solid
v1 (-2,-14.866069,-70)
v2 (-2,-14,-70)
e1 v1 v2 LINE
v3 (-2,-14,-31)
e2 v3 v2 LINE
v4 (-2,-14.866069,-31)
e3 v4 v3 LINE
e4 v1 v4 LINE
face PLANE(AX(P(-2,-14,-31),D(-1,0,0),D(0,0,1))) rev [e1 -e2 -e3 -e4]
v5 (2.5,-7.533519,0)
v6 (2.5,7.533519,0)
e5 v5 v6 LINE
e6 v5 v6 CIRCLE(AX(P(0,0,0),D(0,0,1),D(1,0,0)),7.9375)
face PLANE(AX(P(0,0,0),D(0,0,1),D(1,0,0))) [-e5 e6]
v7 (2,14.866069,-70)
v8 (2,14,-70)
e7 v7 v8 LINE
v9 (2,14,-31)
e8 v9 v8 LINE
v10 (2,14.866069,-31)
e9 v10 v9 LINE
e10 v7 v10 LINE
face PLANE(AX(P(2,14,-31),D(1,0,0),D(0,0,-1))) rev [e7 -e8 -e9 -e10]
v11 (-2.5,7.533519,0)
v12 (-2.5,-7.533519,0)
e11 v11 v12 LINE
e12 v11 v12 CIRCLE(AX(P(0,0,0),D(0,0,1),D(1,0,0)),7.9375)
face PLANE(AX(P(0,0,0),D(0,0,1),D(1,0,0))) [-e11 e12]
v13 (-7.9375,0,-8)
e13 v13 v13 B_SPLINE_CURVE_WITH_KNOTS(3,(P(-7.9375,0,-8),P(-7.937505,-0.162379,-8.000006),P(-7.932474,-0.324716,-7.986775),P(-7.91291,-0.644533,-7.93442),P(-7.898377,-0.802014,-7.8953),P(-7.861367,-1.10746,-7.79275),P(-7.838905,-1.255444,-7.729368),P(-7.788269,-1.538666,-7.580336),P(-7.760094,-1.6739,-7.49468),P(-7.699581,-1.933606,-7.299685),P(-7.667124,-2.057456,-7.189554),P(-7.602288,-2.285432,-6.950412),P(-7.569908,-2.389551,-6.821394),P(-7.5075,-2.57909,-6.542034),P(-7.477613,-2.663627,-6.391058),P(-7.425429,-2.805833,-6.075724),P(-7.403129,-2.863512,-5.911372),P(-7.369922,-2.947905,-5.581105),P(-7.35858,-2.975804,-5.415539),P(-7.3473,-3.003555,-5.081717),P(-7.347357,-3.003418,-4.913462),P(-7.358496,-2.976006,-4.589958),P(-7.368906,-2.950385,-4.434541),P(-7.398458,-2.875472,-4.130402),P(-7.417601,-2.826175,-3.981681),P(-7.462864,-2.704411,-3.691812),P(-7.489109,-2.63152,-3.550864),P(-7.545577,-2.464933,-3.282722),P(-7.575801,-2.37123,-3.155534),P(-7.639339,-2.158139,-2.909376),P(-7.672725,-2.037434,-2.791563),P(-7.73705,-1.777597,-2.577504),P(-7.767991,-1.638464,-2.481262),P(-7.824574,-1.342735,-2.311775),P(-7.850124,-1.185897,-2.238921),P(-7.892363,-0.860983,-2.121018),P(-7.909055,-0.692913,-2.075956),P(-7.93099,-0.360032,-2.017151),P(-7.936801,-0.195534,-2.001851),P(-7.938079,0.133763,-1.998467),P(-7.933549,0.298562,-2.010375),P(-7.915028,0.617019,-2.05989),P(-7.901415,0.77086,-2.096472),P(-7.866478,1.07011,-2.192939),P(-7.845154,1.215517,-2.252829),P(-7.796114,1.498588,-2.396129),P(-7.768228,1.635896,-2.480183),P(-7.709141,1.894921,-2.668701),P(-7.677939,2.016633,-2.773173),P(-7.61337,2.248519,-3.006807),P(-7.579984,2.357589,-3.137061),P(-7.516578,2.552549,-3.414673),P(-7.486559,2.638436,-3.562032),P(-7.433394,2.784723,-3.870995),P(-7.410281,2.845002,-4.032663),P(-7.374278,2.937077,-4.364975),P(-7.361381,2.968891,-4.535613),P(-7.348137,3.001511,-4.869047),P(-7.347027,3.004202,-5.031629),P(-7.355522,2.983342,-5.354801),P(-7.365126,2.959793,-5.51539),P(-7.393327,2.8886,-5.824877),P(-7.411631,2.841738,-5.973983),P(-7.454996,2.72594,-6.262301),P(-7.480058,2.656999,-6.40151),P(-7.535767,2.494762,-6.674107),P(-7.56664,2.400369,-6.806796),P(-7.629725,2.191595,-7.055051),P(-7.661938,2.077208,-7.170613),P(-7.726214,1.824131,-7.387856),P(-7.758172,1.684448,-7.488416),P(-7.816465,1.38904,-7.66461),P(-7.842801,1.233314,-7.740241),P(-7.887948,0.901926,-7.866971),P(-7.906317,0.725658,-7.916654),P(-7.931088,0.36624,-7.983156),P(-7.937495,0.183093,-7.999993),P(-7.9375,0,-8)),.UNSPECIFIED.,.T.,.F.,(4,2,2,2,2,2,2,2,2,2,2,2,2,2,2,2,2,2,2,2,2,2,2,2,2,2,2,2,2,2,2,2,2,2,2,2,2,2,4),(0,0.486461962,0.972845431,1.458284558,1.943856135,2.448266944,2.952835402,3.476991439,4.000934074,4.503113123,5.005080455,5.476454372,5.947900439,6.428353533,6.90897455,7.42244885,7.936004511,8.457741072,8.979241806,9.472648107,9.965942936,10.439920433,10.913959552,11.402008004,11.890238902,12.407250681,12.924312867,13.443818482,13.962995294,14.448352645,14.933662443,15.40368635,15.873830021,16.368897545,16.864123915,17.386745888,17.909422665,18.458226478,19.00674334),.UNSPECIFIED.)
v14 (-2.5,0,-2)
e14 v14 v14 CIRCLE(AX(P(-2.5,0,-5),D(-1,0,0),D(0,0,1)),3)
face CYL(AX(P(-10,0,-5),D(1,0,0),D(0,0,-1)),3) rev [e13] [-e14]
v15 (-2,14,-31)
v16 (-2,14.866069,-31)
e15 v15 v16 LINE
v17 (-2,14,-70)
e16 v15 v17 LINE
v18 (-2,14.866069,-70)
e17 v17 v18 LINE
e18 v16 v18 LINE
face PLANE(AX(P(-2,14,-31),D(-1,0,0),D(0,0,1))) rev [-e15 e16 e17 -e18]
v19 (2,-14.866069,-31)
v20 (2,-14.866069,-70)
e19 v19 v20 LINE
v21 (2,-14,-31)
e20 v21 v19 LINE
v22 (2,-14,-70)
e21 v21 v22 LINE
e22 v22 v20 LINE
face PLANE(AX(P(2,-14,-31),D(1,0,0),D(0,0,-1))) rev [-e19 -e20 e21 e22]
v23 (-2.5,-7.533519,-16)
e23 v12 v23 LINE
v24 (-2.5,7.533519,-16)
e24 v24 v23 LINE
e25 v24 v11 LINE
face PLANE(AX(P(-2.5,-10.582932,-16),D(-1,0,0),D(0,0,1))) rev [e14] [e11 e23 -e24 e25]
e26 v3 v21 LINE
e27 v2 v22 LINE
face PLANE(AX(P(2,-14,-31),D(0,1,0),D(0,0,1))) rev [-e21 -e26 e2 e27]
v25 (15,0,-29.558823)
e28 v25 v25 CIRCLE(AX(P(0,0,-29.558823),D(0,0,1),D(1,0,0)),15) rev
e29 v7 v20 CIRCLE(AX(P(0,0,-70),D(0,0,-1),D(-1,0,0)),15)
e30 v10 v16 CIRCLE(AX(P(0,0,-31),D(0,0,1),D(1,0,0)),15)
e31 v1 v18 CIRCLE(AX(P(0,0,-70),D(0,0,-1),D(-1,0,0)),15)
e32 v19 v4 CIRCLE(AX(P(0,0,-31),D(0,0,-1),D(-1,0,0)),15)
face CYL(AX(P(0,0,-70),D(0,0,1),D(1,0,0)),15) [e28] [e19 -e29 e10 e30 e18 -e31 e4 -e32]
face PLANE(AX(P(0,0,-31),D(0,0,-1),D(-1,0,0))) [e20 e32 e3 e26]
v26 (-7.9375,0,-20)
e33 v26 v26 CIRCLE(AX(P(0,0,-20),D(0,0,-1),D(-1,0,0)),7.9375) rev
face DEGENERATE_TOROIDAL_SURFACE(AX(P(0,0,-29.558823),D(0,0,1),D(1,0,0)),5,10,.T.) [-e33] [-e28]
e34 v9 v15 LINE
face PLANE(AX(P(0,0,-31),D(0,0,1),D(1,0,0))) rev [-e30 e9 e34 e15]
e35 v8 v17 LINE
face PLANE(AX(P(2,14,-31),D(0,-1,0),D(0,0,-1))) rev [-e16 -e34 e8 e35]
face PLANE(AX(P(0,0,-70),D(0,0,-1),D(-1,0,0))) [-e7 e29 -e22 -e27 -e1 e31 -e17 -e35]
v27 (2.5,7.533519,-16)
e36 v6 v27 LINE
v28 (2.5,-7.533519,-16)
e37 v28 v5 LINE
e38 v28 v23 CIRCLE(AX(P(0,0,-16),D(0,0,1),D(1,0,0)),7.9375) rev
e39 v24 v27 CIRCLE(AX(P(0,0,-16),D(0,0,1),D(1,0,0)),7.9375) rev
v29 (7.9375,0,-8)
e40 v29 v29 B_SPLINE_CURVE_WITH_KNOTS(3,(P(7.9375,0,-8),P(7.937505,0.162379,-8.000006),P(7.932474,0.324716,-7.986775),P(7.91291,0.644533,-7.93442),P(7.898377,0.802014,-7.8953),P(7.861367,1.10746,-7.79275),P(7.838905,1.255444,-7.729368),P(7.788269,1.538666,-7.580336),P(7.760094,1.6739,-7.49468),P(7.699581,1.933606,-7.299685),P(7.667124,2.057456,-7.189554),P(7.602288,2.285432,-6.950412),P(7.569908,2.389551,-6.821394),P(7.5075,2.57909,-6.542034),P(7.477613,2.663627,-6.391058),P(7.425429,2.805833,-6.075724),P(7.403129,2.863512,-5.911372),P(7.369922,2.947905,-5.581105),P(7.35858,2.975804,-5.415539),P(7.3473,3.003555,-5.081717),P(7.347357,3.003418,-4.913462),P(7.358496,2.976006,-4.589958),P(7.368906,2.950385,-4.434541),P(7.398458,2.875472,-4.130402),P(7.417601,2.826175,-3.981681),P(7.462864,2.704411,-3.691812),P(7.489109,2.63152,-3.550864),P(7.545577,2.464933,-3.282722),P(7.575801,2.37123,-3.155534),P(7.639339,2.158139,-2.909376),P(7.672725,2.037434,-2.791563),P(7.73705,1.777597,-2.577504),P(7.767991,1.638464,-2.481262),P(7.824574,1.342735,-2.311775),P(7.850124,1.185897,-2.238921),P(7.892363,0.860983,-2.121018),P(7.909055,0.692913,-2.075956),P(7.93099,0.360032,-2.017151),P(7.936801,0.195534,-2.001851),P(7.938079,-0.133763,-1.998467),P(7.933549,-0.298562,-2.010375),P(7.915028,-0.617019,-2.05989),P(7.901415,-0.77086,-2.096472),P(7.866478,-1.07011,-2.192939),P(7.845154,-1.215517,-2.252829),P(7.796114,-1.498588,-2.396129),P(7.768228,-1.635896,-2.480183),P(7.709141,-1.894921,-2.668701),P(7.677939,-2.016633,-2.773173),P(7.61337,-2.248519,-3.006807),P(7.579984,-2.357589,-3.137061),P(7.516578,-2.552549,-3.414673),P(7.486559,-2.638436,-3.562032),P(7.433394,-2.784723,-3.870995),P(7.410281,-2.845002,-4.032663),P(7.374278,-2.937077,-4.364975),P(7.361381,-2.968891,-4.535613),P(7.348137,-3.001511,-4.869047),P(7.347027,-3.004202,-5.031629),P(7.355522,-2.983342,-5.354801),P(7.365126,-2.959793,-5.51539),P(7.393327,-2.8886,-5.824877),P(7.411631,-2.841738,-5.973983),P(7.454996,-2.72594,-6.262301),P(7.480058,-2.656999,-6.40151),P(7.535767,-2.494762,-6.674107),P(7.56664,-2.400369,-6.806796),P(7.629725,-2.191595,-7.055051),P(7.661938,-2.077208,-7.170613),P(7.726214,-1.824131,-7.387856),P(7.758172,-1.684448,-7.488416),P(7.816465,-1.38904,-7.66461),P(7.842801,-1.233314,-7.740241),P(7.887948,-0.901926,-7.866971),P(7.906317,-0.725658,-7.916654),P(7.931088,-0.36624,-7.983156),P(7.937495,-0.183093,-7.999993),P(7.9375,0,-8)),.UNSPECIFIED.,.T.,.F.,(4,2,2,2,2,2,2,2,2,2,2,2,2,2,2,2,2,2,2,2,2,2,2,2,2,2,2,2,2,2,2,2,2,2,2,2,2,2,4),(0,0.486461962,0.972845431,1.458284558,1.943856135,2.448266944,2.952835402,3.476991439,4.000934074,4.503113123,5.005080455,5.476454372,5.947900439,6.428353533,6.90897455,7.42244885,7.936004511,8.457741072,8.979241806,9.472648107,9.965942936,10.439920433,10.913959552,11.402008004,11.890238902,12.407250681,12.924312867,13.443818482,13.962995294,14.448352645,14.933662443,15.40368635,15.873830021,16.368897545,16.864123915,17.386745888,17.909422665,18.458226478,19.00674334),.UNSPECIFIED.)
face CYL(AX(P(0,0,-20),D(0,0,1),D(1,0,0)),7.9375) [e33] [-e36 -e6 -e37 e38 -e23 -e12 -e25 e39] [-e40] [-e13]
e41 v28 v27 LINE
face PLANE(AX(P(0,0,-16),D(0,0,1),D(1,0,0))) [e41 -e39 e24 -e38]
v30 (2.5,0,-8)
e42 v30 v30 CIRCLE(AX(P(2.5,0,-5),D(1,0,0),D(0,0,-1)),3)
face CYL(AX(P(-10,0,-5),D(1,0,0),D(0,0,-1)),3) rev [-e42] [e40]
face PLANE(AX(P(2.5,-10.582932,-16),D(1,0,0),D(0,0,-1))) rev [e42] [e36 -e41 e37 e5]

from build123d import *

# Parameters (mm, degrees)
CROQUIS1_R              = 7.9375
SALIENTE_EXTRUIR1_DEPTH = 20
CROQUIS2_R              = 15
SALIENTE_EXTRUIR2_DEPTH = 50
REDONDEO1_R             = 10
CROQUIS3_W              = 5
CROQUIS3_H              = 21.165863944
CORTAR_EXTRUIR1_DEPTH   = 16
CROQUIS4_R              = 3
CORTAR_EXTRUIR2_DEPTH   = 10
CROQUIS5_W              = 4
CROQUIS5_H              = 2
CORTAR_EXTRUIR3_DEPTH   = 39


with BuildPart() as part:
    # Croquis1 → Saliente-Extruir1 (new body)
    with BuildSketch(Plane.XY):
        Circle(CROQUIS1_R)
    extrude(amount=-SALIENTE_EXTRUIR1_DEPTH)

    # Croquis2 → Saliente-Extruir2 (add)
    with BuildSketch(Plane(origin=(0, 0, -20), x_dir=(-1, 0, 0), z_dir=(0, 0, -1))):
        Circle(CROQUIS2_R)
    extrude(amount=SALIENTE_EXTRUIR2_DEPTH)

    # Redondeo1
    # the kernel refuses this fillet: 10 mm, written as the material it takes off along each edge
    with BuildSketch(Plane(origin=(0, 0, -20), x_dir=(-1, 0, 0), z_dir=(0, -1, 0))) as redondeo1_piece_1:
        with BuildLine():
            CenterArc((5, 9.558822822), REDONDEO1_R, 287.082597034, 72.917402966)
            Line((7.9375, 0), (7.99625, -0.191176456))
            ThreePointArc((7.99625, -0.191176456), (11.46875, -0.2), (15, -0.2))
            Line((15, -0.2), (15.2, 0))
            Line((15.2, 0), (15.2, 9.558822822))
            Line((15.2, 9.558822822), (15, 9.558822822))
        make_face()
    revolve(axis=Axis((0, 0, -20), (0, 0, -1)), mode=Mode.SUBTRACT)

    # Croquis3 → Cortar-Extruir1 (cut)
    with BuildSketch(Plane.XY):
        Rectangle(CROQUIS3_W, CROQUIS3_H)
    extrude(amount=-CORTAR_EXTRUIR1_DEPTH, mode=Mode.SUBTRACT)

    # Croquis4 → Cortar-Extruir2 (cut, symmetric)
    with BuildSketch(Plane(origin=(0, 0, 0), x_dir=(0, 0, -1), z_dir=(1, 0, 0))):
        with Locations((5, 0)):
            Circle(CROQUIS4_R)
    extrude(amount=CORTAR_EXTRUIR2_DEPTH, both=True, mode=Mode.SUBTRACT)

    # Croquis5 → Cortar-Extruir3 (cut)
    with BuildSketch(Plane(origin=(0, 0, -70), x_dir=(-1, 0, 0), z_dir=(0, 0, -1))):
        with Locations((0, 15)):
            Rectangle(CROQUIS5_W, CROQUIS5_H)
        with Locations((0, -15)):
            Rectangle(CROQUIS5_W, CROQUIS5_H)
    extrude(amount=-CORTAR_EXTRUIR3_DEPTH, mode=Mode.SUBTRACT)


solid = part.part
